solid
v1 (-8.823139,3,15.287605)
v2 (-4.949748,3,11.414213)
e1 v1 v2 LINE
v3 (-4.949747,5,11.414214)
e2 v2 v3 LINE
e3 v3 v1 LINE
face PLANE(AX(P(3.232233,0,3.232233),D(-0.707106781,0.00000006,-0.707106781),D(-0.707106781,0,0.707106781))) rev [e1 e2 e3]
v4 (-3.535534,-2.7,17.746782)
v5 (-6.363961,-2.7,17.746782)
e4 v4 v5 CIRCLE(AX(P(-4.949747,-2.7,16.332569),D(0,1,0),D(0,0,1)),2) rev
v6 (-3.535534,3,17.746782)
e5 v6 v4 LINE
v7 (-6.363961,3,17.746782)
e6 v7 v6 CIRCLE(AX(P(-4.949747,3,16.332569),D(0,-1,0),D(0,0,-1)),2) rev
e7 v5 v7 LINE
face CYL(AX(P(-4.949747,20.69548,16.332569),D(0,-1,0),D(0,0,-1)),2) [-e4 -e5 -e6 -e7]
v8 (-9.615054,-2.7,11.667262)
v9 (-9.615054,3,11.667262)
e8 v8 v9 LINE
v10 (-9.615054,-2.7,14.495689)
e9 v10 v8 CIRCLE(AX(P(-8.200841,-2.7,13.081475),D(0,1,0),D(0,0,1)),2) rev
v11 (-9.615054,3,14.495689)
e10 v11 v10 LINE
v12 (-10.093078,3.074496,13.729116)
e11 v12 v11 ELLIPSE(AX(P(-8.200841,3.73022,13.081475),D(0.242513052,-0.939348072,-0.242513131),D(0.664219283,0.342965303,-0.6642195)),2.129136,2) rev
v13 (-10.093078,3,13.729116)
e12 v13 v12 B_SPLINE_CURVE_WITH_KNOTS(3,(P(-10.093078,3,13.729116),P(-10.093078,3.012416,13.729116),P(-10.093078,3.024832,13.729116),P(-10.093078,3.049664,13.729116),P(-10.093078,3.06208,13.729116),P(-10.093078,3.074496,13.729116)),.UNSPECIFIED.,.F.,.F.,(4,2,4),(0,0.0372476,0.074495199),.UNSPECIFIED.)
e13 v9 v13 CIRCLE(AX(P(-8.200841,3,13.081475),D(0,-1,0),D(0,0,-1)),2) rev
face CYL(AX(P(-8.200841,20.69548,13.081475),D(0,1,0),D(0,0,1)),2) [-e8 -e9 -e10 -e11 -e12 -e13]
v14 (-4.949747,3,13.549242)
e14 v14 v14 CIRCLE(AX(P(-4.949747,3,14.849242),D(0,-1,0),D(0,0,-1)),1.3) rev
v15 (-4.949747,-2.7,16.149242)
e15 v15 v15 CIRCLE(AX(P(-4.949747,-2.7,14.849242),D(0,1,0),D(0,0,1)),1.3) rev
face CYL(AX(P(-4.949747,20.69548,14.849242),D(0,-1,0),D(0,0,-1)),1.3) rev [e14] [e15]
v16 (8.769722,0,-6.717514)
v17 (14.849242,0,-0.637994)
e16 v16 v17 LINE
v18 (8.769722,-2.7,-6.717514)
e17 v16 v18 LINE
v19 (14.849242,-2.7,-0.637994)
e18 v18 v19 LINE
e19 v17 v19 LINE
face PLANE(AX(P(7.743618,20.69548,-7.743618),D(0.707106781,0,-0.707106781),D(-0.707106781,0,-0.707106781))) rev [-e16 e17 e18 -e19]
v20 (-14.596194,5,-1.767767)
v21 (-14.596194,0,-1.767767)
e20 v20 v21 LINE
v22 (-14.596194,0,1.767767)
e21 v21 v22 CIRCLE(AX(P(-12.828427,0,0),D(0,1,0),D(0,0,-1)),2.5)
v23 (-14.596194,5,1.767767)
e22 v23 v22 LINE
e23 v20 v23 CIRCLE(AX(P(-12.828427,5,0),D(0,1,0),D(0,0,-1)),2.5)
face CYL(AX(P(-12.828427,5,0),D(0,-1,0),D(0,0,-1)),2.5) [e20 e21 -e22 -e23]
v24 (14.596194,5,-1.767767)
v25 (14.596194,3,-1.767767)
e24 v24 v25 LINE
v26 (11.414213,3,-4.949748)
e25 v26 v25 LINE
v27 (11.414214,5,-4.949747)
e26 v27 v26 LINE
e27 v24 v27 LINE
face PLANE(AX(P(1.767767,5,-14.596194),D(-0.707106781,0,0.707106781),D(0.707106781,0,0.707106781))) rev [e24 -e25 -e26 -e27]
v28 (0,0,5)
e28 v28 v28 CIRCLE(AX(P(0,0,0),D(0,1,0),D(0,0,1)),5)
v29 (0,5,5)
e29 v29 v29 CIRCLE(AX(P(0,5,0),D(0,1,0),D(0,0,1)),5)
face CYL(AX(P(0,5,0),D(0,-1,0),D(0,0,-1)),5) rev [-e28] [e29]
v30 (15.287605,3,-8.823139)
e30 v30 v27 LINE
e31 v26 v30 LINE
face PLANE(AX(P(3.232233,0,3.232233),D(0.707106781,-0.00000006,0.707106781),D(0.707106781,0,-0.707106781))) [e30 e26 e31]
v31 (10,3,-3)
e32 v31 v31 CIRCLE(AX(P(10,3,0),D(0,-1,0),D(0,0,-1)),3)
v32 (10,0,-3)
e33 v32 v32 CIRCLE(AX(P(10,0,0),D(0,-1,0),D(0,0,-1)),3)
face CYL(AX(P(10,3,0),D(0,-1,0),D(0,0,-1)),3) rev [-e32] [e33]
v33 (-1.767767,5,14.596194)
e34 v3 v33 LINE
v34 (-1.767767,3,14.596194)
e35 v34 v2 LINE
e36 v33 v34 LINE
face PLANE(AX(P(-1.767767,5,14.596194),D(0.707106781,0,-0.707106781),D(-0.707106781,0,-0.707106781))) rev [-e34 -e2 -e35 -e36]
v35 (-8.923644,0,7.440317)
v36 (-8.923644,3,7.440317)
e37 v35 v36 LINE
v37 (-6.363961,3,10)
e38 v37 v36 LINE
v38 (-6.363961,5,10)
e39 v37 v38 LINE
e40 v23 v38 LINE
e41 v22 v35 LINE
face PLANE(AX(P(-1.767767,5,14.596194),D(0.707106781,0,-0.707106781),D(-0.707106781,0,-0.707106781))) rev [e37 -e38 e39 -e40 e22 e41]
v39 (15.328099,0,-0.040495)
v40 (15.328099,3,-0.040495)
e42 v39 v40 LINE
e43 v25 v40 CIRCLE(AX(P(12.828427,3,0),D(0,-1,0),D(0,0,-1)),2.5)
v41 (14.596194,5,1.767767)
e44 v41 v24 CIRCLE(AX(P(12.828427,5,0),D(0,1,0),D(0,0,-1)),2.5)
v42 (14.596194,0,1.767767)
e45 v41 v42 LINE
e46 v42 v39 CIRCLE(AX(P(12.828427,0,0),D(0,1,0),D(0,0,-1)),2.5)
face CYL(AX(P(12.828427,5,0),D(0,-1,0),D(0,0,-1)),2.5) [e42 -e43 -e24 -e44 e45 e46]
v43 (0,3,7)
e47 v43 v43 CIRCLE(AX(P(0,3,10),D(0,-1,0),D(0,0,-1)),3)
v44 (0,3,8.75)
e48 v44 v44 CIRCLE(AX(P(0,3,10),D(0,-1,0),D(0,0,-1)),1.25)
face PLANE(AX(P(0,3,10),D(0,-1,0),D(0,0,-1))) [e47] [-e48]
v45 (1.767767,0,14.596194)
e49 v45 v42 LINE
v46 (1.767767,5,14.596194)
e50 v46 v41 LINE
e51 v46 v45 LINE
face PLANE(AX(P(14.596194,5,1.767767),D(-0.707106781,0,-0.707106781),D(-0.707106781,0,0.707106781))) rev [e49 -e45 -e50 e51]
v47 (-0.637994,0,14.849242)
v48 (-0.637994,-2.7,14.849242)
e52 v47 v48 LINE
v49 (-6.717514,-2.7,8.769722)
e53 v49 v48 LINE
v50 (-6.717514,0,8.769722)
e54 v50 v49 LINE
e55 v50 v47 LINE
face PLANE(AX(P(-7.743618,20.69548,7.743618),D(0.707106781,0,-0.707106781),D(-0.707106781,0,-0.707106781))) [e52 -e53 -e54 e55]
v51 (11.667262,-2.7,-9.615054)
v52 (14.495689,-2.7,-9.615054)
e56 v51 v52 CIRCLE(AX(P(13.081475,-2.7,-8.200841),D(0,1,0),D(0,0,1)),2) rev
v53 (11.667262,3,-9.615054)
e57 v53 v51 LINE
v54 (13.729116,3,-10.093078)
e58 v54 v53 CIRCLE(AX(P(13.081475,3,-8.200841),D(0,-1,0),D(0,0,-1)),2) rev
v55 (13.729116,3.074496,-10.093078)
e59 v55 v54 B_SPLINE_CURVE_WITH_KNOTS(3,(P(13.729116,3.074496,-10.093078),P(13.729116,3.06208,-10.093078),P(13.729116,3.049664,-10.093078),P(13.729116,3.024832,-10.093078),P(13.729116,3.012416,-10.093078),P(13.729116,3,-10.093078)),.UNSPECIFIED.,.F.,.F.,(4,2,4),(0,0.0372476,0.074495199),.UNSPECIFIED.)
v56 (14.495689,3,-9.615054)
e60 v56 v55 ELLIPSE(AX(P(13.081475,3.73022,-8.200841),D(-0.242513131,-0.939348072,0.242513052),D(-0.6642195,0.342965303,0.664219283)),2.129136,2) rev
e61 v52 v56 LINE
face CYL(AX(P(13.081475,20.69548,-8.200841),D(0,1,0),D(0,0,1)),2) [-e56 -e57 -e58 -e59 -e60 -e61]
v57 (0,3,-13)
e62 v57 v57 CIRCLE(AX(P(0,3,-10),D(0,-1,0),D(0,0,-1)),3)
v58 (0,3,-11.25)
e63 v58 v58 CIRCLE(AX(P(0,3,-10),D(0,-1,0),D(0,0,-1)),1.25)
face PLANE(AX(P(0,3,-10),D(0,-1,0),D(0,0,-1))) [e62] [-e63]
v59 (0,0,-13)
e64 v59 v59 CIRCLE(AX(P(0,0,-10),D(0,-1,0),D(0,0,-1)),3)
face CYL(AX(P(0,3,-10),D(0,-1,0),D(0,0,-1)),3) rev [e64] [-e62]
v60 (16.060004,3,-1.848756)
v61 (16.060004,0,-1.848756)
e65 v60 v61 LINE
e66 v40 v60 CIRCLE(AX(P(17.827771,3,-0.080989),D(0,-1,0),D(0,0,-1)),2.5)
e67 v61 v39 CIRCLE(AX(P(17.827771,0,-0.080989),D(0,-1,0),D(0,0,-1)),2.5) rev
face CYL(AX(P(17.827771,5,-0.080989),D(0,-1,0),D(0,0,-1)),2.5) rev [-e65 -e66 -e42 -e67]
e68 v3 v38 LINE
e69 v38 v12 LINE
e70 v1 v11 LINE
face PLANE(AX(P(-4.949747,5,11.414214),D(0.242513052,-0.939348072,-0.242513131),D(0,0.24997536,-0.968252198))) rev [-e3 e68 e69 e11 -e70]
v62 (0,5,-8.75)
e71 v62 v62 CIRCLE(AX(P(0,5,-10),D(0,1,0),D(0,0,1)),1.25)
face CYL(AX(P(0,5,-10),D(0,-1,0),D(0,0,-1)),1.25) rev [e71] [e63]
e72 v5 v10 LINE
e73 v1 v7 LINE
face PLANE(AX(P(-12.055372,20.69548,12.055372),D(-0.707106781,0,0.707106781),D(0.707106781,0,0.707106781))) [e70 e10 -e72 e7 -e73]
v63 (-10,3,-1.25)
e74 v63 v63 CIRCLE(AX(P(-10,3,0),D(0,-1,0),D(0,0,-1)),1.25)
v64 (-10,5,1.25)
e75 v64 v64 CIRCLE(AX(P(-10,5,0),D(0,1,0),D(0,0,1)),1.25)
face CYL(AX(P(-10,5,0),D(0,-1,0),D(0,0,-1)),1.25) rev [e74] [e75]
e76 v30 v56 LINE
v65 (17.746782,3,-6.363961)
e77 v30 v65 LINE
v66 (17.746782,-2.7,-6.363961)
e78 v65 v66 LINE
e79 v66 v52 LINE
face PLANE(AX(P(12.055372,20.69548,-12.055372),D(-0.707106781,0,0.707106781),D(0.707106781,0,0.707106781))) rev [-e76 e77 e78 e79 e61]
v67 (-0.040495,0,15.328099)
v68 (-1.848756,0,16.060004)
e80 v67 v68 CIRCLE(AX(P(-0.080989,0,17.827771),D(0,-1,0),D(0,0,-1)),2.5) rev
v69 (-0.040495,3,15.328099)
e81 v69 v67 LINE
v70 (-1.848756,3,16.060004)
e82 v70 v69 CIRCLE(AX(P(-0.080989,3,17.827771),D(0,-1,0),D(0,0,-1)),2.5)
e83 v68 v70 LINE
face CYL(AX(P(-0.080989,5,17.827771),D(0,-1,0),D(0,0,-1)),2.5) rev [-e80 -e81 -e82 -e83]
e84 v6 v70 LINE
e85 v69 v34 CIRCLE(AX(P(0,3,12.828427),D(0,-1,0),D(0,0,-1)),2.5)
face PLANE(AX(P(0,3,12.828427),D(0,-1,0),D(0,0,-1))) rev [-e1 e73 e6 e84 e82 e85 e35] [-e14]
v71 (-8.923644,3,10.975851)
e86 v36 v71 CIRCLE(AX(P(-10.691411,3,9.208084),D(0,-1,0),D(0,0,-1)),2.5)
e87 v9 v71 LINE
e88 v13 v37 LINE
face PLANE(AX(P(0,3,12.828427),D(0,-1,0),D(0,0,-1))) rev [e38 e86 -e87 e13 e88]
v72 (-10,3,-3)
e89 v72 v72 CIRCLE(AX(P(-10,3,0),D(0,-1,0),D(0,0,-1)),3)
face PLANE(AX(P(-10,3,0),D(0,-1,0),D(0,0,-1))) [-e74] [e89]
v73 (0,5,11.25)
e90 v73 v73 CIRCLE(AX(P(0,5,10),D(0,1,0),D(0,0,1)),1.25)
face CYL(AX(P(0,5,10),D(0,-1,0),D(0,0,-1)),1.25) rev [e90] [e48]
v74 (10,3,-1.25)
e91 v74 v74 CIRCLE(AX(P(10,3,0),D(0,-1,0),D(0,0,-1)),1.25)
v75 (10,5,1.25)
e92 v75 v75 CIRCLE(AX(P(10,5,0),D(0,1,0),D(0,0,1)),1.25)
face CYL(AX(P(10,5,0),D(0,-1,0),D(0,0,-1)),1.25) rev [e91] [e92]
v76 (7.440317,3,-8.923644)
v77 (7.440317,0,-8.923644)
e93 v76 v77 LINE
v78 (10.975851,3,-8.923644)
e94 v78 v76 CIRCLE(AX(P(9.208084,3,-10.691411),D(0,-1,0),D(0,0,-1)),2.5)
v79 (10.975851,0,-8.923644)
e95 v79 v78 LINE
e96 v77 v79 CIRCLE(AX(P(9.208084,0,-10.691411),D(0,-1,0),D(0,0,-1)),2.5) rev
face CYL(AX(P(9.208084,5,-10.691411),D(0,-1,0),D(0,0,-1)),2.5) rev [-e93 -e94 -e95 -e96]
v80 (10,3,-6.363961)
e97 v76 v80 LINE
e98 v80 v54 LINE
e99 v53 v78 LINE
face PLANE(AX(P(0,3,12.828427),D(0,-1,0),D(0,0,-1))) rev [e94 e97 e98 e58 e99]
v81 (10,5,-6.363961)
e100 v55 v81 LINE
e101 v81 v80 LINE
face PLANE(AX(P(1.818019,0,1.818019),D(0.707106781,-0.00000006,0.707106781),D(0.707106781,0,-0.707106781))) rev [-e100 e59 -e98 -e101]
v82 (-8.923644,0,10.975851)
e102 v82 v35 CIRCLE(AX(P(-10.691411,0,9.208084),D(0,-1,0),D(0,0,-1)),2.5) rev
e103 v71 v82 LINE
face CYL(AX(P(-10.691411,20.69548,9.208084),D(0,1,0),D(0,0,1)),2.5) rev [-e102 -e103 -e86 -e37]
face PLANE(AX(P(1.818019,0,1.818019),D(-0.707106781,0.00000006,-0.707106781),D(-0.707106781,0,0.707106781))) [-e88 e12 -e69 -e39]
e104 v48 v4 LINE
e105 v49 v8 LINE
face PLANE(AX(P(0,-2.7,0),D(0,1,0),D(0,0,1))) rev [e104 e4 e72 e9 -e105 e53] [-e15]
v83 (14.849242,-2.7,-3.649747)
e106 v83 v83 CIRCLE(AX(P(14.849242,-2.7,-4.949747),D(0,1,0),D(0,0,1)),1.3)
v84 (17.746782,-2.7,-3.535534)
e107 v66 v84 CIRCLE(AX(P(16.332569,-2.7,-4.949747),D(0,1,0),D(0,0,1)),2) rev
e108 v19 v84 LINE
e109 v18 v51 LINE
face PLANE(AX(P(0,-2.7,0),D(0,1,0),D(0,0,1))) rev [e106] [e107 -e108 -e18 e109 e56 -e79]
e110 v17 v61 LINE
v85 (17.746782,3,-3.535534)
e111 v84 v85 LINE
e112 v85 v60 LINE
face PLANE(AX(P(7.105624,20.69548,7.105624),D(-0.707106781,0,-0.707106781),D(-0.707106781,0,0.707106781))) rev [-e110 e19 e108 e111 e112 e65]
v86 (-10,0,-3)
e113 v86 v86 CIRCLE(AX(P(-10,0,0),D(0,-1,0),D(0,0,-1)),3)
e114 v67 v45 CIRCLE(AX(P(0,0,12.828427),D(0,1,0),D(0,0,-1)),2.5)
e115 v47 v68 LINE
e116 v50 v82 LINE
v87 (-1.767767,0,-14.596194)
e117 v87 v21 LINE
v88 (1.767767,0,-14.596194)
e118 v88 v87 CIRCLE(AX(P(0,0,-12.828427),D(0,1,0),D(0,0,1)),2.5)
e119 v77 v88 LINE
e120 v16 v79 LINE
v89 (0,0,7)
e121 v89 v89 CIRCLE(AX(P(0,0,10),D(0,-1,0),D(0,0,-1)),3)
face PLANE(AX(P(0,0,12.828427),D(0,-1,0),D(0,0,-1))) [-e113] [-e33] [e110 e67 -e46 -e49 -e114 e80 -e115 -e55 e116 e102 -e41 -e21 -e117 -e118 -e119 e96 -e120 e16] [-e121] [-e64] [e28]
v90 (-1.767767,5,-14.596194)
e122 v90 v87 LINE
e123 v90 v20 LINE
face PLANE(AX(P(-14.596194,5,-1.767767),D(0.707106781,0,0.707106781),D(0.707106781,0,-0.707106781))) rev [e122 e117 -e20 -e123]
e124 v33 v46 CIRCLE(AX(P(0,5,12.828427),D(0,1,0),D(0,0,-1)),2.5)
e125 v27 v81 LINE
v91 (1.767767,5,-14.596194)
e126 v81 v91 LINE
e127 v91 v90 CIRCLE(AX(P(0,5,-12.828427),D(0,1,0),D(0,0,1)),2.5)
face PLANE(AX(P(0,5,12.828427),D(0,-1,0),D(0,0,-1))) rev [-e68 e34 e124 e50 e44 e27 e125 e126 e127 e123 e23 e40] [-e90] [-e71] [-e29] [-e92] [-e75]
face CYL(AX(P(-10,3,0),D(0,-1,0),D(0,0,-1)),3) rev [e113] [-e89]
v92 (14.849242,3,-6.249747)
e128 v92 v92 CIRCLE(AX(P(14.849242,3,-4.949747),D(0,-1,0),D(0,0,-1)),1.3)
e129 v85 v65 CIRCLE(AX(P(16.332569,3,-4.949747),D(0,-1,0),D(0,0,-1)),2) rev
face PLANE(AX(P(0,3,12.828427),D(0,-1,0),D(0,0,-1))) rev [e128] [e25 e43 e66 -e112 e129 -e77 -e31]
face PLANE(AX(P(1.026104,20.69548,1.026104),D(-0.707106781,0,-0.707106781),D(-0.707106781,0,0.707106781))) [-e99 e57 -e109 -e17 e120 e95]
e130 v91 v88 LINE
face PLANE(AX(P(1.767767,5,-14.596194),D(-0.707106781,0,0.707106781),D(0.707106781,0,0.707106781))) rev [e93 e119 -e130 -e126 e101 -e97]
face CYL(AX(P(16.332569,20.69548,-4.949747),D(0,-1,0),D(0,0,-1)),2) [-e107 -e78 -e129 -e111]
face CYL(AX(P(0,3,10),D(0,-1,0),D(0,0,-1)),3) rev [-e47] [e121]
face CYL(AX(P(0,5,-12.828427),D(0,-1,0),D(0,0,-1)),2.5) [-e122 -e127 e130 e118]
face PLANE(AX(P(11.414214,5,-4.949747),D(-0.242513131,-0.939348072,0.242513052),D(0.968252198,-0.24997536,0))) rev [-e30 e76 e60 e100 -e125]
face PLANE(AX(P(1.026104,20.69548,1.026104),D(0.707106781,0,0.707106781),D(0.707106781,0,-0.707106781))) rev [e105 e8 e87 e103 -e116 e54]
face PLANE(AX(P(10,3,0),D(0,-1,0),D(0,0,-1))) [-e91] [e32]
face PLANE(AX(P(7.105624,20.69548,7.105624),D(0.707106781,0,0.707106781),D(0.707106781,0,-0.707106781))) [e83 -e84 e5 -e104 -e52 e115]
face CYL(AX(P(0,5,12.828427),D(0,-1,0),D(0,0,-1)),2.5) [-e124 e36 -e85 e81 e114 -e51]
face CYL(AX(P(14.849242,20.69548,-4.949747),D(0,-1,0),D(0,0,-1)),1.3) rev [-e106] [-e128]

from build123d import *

# Parameters (mm, degrees)
SKETCH1_R           = 1.25
SKETCH1_R_2         = 5
BOSS_EXTRUDE1_DEPTH = 5
SKETCH4_R           = 3
CUT_EXTRUDE2_DEPTH  = 3
SKETCH3_R           = 1.3
BOSS_EXTRUDE4_DEPTH = 5.7
BOSS_EXTRUDE6_DEPTH = 1
FILLET1_R           = 2.5
FILLET2_R           = 2


with BuildPart() as part:
    # Sketch1 → Boss-Extrude1 (new body)
    with BuildSketch(Plane(origin=(0, 0, 0), x_dir=(1, 0, 0), z_dir=(0, 1, 0))):
        with BuildLine():
            Line((1.767766953, 14.596194078), (14.596194078, 1.767766953))
            ThreePointArc((14.596194078, 1.767766953), (15.328427125, 0), (14.596194078, -1.767766953))
            Line((14.596194078, -1.767766953), (1.767766953, -14.596194078))
            ThreePointArc((1.767766953, -14.596194078), (0, -15.328427125), (-1.767766953, -14.596194078))
            Line((-1.767766953, -14.596194078), (-14.596194078, -1.767766953))
            ThreePointArc((-14.596194078, -1.767766953), (-15.328427125, 0), (-14.596194078, 1.767766953))
            Line((-14.596194078, 1.767766953), (-1.767766953, 14.596194078))
            ThreePointArc((-1.767766953, 14.596194078), (0, 15.328427125), (1.767766953, 14.596194078))
        make_face()
        with Locations(Location((0, 10, 0), (0, 0, 270))):
            Circle(SKETCH1_R, mode=Mode.SUBTRACT)
        with Locations(Location((0, -10, 0), (0, 0, 270))):
            Circle(SKETCH1_R, mode=Mode.SUBTRACT)
        with Locations(Location((10, 0, 0), (0, 0, 270))):
            Circle(SKETCH1_R, mode=Mode.SUBTRACT)
        with Locations(Location((-10, 0, 0), (0, 0, 270))):
            Circle(SKETCH1_R, mode=Mode.SUBTRACT)
        with Locations(Location((0, 0, 0), (0, 0, 270))):
            Circle(SKETCH1_R_2, mode=Mode.SUBTRACT)
    extrude(amount=BOSS_EXTRUDE1_DEPTH)

    # Sketch4 → Cut-Extrude2 (cut)
    with BuildSketch(Plane.XZ):
        with Locations(Location((0, 10, 0), (0, 0, 270))):
            Circle(SKETCH4_R)
        with Locations(Location((10, 0, 0), (0, 0, 270))):
            Circle(SKETCH4_R)
        with Locations(Location((-10, 0, 0), (0, 0, 270))):
            Circle(SKETCH4_R)
        with Locations(Location((0, -10, 0), (0, 0, 270))):
            Circle(SKETCH4_R)
    extrude(amount=-CUT_EXTRUDE2_DEPTH, mode=Mode.SUBTRACT)

    # Sketch3 → Boss-Extrude4 (add)
    # profile 1 of 4: a face of its own
    with BuildSketch(Plane(origin=(0, -2.7, 0), x_dir=(1, 0, 0), z_dir=(0, 1, 0))):
        Polygon((-4.949747468, -10.537489101), (-0.637994164, -14.849242405), (-4.949747468, -19.160995709), (-9.261500772, -14.849242405), align=None)
        with Locations(Location((-4.949747468, -14.849242405, 0), (0, 0, 90))):
            Circle(SKETCH3_R, mode=Mode.SUBTRACT)
    # profile 2 of 4: a face of its own
    with BuildSketch(Plane(origin=(0, -2.7, 0), x_dir=(1, 0, 0), z_dir=(0, 1, 0))):
        Polygon((-6.717514421, -8.769722148), (-11.029267725, -13.081475452), (-9.261500772, -14.849242405), (-4.949747468, -10.537489101), align=None)
    # profile 3 of 4: a face of its own
    with BuildSketch(Plane(origin=(0, -2.7, 0), x_dir=(1, 0, 0), z_dir=(0, 1, 0))):
        Polygon((19.160995709, 4.949747468), (14.849242405, 9.261500772), (10.537489101, 4.949747468), (14.849242405, 0.637994164), align=None)
        with Locations(Location((14.849242405, 4.949747468, 0), (0, 0, 90))):
            Circle(SKETCH3_R, mode=Mode.SUBTRACT)
    # profile 4 of 4: a face of its own
    with BuildSketch(Plane(origin=(0, -2.7, 0), x_dir=(1, 0, 0), z_dir=(0, 1, 0))):
        Polygon((13.081475452, 11.029267725), (14.849242405, 9.261500772), (10.537489101, 4.949747468), (8.769722148, 6.717514421), align=None)
    extrude(amount=BOSS_EXTRUDE4_DEPTH)


with BuildPart() as boss_extrude6_tool:
    # Sketch7 → Boss-Extrude6 (new, symmetric)
    with BuildSketch(Plane(origin=(2.525126055, -2.13e-07, 2.525126055), x_dir=(0.7071067811865474, 0, -0.7071067811865477), z_dir=(0.7071067811865465, -5.960464483662305e-08, 0.7071067811865461))):
        Polygon((11.571067812, 5.000000541), (17.04887, 3.000000599), (11.571067812, 3.000000541), align=None)
        Polygon((-11.571067812, 5.000000541), (-17.04887, 3.000000599), (-11.571067812, 3.000000541), align=None)
    extrude(amount=BOSS_EXTRUDE6_DEPTH, both=True)


with BuildPart() as part_1:
    add(part.part)


with BuildPart() as part_2:
    # Boss-Extrude6: joined with boss_extrude6_tool
    add(part_1.part.fuse(boss_extrude6_tool.part, tol=0.00001))

    # Fillet1
    fillet1_edges = [part_2.edges().sort_by_distance(p)[0] for p in [
        (-7.155876652, 1.5, 9.208084379),
        (-0.935534875, 1.5, 15.146783115),
        (9.208084379, 1.5, -7.155876652),
        (15.146783115, 1.5, -0.935534875),
    ]]
    fillet(fillet1_edges, radius=FILLET1_R)

    # Fillet2
    # the kernel refuses this fillet: 2 mm, written as the material it takes off along each edge
    with BuildSketch(Plane(origin=(-4.949747468, -7.7, 19.160995709), x_dir=(-0.7071067811865471, 0, -0.707106781186548), z_dir=(0, 1, 0)), Plane(origin=(13.081475452, -7.7, -11.029267725), x_dir=(0.7071067811865476, 0, 0.7071067811865476), z_dir=(0, 1, 0))) as fillet2_piece_1:
        with BuildLine():
            CenterArc((FILLET2_R, -FILLET2_R), FILLET2_R, 90, 90)
            Line((0, -FILLET2_R), (0, 0))
            Line((0, 0), (FILLET2_R, 0))
        make_face()
    extrude(amount=15.7, mode=Mode.SUBTRACT)
    with BuildSketch(Plane(origin=(-11.029267725, -7.7, 13.081475452), x_dir=(0.707106781186547, 0, 0.7071067811865479), z_dir=(0, 1, 0)), Plane(origin=(19.160995709, -7.7, -4.949747468), x_dir=(-0.7071067811865482, 0, -0.7071067811865469), z_dir=(0, 1, 0))) as fillet2_piece_2:
        with BuildLine():
            CenterArc((FILLET2_R, FILLET2_R), FILLET2_R, 180, 90)
            Line((0, FILLET2_R), (0, 0))
            Line((0, 0), (FILLET2_R, 0))
        make_face()
    extrude(amount=15.7, mode=Mode.SUBTRACT)


solid = part_2.part
